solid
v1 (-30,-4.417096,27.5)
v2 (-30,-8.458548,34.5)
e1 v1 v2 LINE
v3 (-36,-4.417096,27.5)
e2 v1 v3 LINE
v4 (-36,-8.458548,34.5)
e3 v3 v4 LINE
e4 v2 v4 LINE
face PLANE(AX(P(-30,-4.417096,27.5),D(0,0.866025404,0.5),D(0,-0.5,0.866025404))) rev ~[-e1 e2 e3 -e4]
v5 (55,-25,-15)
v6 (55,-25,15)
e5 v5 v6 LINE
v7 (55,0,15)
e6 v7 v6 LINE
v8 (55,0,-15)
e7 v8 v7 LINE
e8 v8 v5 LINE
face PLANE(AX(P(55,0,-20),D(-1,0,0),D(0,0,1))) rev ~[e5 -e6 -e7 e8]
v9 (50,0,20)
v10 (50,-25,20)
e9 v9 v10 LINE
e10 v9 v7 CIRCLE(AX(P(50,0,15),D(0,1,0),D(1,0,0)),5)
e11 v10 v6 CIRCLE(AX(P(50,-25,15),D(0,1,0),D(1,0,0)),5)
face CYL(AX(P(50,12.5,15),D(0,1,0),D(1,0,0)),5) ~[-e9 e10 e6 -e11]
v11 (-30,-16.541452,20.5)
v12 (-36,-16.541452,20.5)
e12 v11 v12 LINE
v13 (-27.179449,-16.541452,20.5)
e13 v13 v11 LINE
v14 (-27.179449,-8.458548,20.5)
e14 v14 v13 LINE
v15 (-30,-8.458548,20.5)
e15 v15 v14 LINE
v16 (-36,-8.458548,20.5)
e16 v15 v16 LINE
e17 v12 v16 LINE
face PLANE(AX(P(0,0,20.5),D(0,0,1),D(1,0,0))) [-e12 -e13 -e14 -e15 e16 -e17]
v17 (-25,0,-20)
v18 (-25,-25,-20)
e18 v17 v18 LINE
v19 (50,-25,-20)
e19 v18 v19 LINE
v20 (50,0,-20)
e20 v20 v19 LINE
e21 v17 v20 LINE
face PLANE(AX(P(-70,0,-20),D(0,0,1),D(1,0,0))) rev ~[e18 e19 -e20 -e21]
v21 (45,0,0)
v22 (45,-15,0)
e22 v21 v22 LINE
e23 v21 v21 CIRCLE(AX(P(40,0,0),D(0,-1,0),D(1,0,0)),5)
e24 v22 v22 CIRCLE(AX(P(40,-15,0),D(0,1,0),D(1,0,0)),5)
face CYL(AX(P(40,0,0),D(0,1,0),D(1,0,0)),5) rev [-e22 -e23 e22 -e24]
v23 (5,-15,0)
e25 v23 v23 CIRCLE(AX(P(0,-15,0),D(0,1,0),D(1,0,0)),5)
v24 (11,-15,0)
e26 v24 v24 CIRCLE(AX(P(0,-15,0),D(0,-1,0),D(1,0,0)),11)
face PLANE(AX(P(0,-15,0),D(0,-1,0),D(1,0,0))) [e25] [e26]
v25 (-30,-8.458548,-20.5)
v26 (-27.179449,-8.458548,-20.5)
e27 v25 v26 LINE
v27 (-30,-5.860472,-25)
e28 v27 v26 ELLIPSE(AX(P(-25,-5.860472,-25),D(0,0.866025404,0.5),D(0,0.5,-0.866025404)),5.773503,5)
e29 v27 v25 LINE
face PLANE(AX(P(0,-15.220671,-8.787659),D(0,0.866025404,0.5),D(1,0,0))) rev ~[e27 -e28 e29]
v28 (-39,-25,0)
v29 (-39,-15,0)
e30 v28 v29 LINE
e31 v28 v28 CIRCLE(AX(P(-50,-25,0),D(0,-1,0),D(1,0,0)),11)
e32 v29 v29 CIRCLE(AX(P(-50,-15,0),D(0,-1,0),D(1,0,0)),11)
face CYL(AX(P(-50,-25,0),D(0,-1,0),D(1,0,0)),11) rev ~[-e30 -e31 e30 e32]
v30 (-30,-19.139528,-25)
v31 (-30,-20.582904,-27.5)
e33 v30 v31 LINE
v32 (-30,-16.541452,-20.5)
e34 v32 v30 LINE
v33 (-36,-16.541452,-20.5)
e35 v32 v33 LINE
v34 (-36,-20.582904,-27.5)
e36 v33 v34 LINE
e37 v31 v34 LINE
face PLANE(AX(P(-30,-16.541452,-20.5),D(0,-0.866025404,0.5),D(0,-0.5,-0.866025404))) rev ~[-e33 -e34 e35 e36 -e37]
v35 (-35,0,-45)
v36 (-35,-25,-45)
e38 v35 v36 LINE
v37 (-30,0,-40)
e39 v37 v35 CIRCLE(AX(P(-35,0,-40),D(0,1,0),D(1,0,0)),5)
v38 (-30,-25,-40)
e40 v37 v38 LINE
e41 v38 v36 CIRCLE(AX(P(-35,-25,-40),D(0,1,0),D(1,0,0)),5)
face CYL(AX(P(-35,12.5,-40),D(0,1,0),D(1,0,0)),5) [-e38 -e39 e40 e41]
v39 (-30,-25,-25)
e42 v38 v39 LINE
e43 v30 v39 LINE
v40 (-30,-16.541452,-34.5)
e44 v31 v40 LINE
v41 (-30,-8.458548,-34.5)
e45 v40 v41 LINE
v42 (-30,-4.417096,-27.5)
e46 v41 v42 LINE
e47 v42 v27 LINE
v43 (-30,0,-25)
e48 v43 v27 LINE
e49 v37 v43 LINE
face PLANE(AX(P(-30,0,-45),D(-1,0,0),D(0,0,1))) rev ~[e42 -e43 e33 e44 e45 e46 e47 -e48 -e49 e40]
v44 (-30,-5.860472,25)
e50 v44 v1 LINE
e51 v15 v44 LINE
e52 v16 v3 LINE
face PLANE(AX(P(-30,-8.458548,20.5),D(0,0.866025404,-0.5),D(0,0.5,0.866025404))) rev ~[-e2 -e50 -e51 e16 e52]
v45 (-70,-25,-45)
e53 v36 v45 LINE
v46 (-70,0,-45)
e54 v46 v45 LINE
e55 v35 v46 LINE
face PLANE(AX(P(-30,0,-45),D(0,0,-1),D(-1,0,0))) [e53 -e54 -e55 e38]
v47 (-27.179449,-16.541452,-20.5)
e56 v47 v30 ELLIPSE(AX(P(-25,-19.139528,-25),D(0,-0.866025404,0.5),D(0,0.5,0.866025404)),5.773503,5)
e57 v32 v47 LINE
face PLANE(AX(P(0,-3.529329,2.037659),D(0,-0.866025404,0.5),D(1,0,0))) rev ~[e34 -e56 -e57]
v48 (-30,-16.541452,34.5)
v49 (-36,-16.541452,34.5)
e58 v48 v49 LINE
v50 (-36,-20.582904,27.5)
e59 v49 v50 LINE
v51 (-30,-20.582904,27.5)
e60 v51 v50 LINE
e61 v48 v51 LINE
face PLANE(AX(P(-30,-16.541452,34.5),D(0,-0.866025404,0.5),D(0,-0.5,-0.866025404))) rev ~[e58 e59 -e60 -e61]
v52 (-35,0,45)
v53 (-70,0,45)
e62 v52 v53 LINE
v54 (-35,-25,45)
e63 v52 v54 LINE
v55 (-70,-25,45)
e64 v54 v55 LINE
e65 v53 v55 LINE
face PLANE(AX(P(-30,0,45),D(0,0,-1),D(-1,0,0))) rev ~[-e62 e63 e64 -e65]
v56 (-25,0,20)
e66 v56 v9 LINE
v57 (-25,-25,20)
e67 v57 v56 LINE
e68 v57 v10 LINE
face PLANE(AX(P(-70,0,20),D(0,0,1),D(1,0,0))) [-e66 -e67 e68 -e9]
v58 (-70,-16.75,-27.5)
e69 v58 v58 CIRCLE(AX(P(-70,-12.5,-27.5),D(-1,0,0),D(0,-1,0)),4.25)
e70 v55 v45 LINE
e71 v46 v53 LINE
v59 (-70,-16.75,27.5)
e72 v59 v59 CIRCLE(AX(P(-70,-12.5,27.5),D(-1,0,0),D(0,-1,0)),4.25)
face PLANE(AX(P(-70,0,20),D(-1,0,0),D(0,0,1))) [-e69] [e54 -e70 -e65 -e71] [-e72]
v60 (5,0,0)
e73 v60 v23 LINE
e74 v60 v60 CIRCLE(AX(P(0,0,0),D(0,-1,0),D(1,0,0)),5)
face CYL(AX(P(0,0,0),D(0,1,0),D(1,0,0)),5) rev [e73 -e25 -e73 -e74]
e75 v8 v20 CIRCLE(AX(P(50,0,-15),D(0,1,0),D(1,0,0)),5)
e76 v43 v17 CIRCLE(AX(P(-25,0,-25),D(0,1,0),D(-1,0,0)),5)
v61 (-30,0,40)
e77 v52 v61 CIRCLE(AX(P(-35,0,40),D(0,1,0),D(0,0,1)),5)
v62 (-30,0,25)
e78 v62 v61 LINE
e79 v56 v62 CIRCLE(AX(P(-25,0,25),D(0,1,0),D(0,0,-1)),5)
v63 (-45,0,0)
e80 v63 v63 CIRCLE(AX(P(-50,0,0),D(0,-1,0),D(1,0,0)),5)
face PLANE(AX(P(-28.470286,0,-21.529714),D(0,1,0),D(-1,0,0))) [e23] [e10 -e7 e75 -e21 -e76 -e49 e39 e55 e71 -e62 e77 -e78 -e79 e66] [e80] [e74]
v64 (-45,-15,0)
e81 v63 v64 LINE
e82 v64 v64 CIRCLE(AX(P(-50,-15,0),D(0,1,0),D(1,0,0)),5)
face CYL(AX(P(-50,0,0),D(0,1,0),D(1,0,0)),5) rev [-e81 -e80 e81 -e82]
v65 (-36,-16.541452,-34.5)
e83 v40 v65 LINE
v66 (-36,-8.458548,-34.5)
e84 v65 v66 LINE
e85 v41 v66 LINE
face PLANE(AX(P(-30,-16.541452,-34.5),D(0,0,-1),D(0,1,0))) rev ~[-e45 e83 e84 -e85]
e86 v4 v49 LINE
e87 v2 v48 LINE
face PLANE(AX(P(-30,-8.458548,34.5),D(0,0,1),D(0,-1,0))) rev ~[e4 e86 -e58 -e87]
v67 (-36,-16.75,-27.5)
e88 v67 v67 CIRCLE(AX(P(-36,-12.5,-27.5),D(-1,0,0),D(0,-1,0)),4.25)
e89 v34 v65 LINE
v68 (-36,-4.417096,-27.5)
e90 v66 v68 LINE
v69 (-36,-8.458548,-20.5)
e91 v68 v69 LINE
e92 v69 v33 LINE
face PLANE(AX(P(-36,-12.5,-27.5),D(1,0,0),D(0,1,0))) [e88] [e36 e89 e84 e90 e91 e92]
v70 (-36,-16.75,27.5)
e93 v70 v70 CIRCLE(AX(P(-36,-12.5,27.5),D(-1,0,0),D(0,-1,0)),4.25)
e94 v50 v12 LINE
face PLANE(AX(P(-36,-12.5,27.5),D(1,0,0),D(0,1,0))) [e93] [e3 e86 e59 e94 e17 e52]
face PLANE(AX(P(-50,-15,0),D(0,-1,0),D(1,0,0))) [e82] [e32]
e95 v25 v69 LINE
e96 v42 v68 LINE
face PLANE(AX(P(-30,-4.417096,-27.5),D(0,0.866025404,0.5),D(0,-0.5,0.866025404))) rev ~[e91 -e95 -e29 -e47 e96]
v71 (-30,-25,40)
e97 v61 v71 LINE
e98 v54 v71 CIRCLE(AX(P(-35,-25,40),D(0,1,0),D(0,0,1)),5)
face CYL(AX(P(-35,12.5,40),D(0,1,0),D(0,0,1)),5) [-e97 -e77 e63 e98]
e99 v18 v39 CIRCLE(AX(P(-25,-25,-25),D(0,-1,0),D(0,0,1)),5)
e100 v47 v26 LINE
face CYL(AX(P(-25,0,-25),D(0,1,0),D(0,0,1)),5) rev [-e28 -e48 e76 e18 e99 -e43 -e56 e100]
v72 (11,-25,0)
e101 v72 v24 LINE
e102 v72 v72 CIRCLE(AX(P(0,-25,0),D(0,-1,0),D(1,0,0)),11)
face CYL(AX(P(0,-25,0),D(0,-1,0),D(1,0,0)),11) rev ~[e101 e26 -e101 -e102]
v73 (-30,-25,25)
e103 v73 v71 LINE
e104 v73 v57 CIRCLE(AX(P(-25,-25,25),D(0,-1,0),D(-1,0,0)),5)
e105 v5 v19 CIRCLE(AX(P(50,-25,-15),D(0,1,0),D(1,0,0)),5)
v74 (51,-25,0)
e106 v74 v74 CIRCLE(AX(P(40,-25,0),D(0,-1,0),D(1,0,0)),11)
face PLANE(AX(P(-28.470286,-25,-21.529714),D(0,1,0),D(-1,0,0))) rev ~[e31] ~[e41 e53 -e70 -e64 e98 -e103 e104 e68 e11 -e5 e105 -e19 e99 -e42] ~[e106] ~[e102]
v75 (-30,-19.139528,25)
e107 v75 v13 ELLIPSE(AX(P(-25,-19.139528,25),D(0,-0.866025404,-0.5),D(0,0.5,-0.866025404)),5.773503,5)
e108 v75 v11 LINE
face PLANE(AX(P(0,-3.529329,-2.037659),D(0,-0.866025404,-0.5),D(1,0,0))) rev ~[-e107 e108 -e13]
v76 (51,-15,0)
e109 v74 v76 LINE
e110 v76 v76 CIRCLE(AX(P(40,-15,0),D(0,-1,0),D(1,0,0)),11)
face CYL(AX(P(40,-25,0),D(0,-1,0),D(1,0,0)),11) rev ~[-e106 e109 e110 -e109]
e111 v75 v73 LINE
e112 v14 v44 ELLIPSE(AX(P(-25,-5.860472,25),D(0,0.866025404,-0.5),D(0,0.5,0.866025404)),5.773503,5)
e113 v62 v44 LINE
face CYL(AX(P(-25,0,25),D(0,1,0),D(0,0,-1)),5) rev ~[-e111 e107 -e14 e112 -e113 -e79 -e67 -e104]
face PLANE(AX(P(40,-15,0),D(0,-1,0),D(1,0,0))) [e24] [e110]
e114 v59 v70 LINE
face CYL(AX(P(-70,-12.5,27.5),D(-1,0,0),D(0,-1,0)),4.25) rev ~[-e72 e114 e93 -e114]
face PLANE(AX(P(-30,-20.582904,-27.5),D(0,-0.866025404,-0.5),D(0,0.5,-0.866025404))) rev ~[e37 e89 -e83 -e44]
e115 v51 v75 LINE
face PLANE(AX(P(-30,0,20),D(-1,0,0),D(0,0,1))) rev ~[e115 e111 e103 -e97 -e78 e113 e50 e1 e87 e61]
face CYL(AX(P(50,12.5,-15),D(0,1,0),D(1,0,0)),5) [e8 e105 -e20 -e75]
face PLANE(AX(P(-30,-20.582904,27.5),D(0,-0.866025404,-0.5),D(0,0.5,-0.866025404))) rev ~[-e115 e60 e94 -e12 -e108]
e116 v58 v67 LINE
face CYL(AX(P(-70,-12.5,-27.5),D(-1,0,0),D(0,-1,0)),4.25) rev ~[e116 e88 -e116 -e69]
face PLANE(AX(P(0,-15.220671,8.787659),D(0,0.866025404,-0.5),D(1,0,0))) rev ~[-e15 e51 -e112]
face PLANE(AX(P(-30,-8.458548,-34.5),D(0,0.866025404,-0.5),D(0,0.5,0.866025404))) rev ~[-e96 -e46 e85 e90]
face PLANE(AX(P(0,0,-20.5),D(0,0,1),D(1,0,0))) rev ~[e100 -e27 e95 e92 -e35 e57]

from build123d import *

# Parameters (mm, degrees)
F0_W          = 125
F0_H          = 40
F0_R          = 5
F1_DEPTH      = 25
F2_R          = 11
F3_DEPTH      = 10
F4_W          = 40
F4_H          = 25
F5_DEPTH      = 25
F6_R          = 4.25
F7_DEPTH      = 40
F9_DEPTH      = 6
F10_T4_DEPTH  = 25
F10_T10_DEPTH = 25
F10_T16_DEPTH = 25
F10_T23_DEPTH = 25
F10_T29_DEPTH = 25
F10_T35_DEPTH = 25
F10_T41_DEPTH = 25
F10_T47_DEPTH = 25
F10_T54_DEPTH = 25
F10_T60_DEPTH = 25
F10_T63_DEPTH = 50


# Not quite as in the source:
# - a fillet or chamfer that OpenCascade refuses, or shapes differently, is made with other operations: its cross-section is extruded or revolved along the edge and cut away or added


with BuildPart() as f1:
    # F0 (on Front) → F1 (new body)
    with BuildSketch(Plane.XZ):
        with Locations((-7.5, 0)):
            Rectangle(F0_W, F0_H)
        with Locations((-50, 0)):
            Circle(F0_R, mode=Mode.SUBTRACT)
        Circle(F0_R, mode=Mode.SUBTRACT)
        with Locations((40, 0)):
            Circle(F0_R, mode=Mode.SUBTRACT)
    extrude(amount=F1_DEPTH)

    # F2 (on face) → F3 (cut)
    with BuildSketch(Plane.XZ.offset(25)):
        with Locations((-50, 0)):
            Circle(F2_R)
        Circle(F2_R)
        with Locations((40, 0)):
            Circle(F2_R)
    extrude(amount=-F3_DEPTH, mode=Mode.SUBTRACT)

    # F4 (on face) → F5 (join)
    with BuildSketch(Plane(origin=(0, 0, 0), x_dir=(-1, 0, 0), z_dir=(0, 1, 0))):
        with Locations((50, 32.5)):
            Rectangle(F4_W, F4_H)
        with Locations((50, -32.5)):
            Rectangle(F4_W, F4_H)
    extrude(amount=-F5_DEPTH)

    # F6 (on face) → F7 (cut, through all)
    with BuildSketch(Plane(origin=(-70, 0, 0), x_dir=(0, -1, 0), z_dir=(-1, 0, 0))):
        with Locations((12.5, 27.5)):
            Circle(F6_R)
        with Locations((12.5, -27.5)):
            Circle(F6_R)
    extrude(amount=-F7_DEPTH, mode=Mode.SUBTRACT)

    # F8 (on face) → F9 (cut)
    with BuildSketch(Plane.YZ.offset(-30)):
        Polygon((-8.4585481157, 34.5), (-16.5414518843, 34.5), (-20.5829037687, 27.5), (-16.5414518843, 20.5), (-8.4585481157, 20.5), (-4.4170962313, 27.5), align=None)
        Polygon((-8.4585481157, -20.5), (-16.5414518843, -20.5), (-20.5829037687, -27.5), (-16.5414518843, -34.5), (-8.4585481157, -34.5), (-4.4170962313, -27.5), align=None)
    extrude(amount=-F9_DEPTH, mode=Mode.SUBTRACT)

    # F10: fillet of radius 5 on 6 edges, made by hand


with BuildPart() as f10_tool2:
    # F10_s3 → F10_t4 (new body)
    with BuildSketch(Plane.XZ):
        with BuildLine():
            ThreePointArc((-25, 20), (-28.5355339059, 21.4644660941), (-30, 25))
            Line((-30, 25), (-30, 20))
            Line((-30, 20), (-25, 20))
        make_face()
    extrude(amount=F10_T4_DEPTH)

    split(bisect_by=Plane.XY.offset(20.5), keep=Keep.BOTTOM)

    split(bisect_by=Plane(origin=(0, -15.2206714755, 8.7876587737), x_dir=(1, 0, 0), z_dir=(0, 0.8660254038, -0.5)), keep=Keep.TOP)


with BuildPart() as f1_1:
    add(f1.part)

    # F10_t1: union F10_tool2
    add(f10_tool2.part)


with BuildPart() as f10_tool8:
    # F10_s9 → F10_t10 (new body)
    with BuildSketch(Plane.XZ):
        with BuildLine():
            ThreePointArc((-25, 20), (-28.5355339059, 21.4644660941), (-30, 25))
            Line((-30, 25), (-30, 20))
            Line((-30, 20), (-25, 20))
        make_face()
    extrude(amount=F10_T10_DEPTH)

    split(bisect_by=Plane.XY.offset(20.5), keep=Keep.TOP)

    split(bisect_by=Plane(origin=(0, -15.2206714755, 8.7876587737), x_dir=(1, 0, 0), z_dir=(0, 0.8660254038, -0.5)), keep=Keep.TOP)


with BuildPart() as f1_2:
    add(f1_1.part)

    # F10_t7: union F10_tool8
    add(f10_tool8.part)


with BuildPart() as f10_tool14:
    # F10_s15 → F10_t16 (new body)
    with BuildSketch(Plane.XZ):
        with BuildLine():
            ThreePointArc((-25, 20), (-28.5355339059, 21.4644660941), (-30, 25))
            Line((-30, 25), (-30, 20))
            Line((-30, 20), (-25, 20))
        make_face()
    extrude(amount=F10_T16_DEPTH)

    split(bisect_by=Plane(origin=(0, -3.5293285245, -2.0376587737), x_dir=(1, 0, 0), z_dir=(0, 0.8660254038, 0.5)), keep=Keep.TOP)

    split(bisect_by=Plane.XY.offset(20.5), keep=Keep.BOTTOM)

    split(bisect_by=Plane(origin=(0, -15.2206714755, 8.7876587737), x_dir=(1, 0, 0), z_dir=(0, -0.8660254038, 0.5)), keep=Keep.TOP)


with BuildPart() as f1_3:
    add(f1_2.part)

    # F10_t13: union F10_tool14
    add(f10_tool14.part)


with BuildPart() as f10_tool21:
    # F10_s22 → F10_t23 (new body)
    with BuildSketch(Plane.XZ):
        with BuildLine():
            ThreePointArc((-25, 20), (-28.5355339059, 21.4644660941), (-30, 25))
            Line((-30, 25), (-30, 20))
            Line((-30, 20), (-25, 20))
        make_face()
    extrude(amount=F10_T23_DEPTH)

    split(bisect_by=Plane(origin=(0, -3.5293285245, -2.0376587737), x_dir=(1, 0, 0), z_dir=(0, -0.8660254038, -0.5)), keep=Keep.TOP)

    split(bisect_by=Plane.XY.offset(20.5), keep=Keep.BOTTOM)


with BuildPart() as f1_4:
    add(f1_3.part)

    # F10_t20: union F10_tool21
    add(f10_tool21.part)


with BuildPart() as f10_tool27:
    # F10_s28 → F10_t29 (new body)
    with BuildSketch(Plane.XZ):
        with BuildLine():
            ThreePointArc((-25, 20), (-28.5355339059, 21.4644660941), (-30, 25))
            Line((-30, 25), (-30, 20))
            Line((-30, 20), (-25, 20))
        make_face()
    extrude(amount=F10_T29_DEPTH)

    split(bisect_by=Plane(origin=(0, -3.5293285245, -2.0376587737), x_dir=(1, 0, 0), z_dir=(0, -0.8660254038, -0.5)), keep=Keep.TOP)

    split(bisect_by=Plane.XY.offset(20.5), keep=Keep.TOP)


with BuildPart() as f1_5:
    add(f1_4.part)

    # F10_t26: union F10_tool27
    add(f10_tool27.part)


with BuildPart() as f10_tool33:
    # F10_s34 → F10_t35 (new body)
    with BuildSketch(Plane.XZ):
        with BuildLine():
            ThreePointArc((-25, -20), (-28.5355339059, -21.4644660941), (-30, -25))
            Line((-30, -25), (-30, -20))
            Line((-30, -20), (-25, -20))
        make_face()
    extrude(amount=F10_T35_DEPTH)

    split(bisect_by=Plane.XY.offset(-20.5), keep=Keep.TOP)

    split(bisect_by=Plane(origin=(0, -15.2206714755, -8.7876587737), x_dir=(1, 0, 0), z_dir=(0, 0.8660254038, 0.5)), keep=Keep.TOP)


with BuildPart() as f1_6:
    add(f1_5.part)

    # F10_t32: union F10_tool33
    add(f10_tool33.part)


with BuildPart() as f10_tool39:
    # F10_s40 → F10_t41 (new body)
    with BuildSketch(Plane.XZ):
        with BuildLine():
            ThreePointArc((-25, -20), (-28.5355339059, -21.4644660941), (-30, -25))
            Line((-30, -25), (-30, -20))
            Line((-30, -20), (-25, -20))
        make_face()
    extrude(amount=F10_T41_DEPTH)

    split(bisect_by=Plane.XY.offset(-20.5), keep=Keep.BOTTOM)

    split(bisect_by=Plane(origin=(0, -15.2206714755, -8.7876587737), x_dir=(1, 0, 0), z_dir=(0, 0.8660254038, 0.5)), keep=Keep.TOP)


with BuildPart() as f1_7:
    add(f1_6.part)

    # F10_t38: union F10_tool39
    add(f10_tool39.part)


with BuildPart() as f10_tool45:
    # F10_s46 → F10_t47 (new body)
    with BuildSketch(Plane.XZ):
        with BuildLine():
            ThreePointArc((-25, -20), (-28.5355339059, -21.4644660941), (-30, -25))
            Line((-30, -25), (-30, -20))
            Line((-30, -20), (-25, -20))
        make_face()
    extrude(amount=F10_T47_DEPTH)

    split(bisect_by=Plane.XY.offset(-20.5), keep=Keep.TOP)

    split(bisect_by=Plane(origin=(0, -3.5293285245, 2.0376587737), x_dir=(1, 0, 0), z_dir=(0, 0.8660254038, -0.5)), keep=Keep.TOP)

    split(bisect_by=Plane(origin=(0, -15.2206714755, -8.7876587737), x_dir=(1, 0, 0), z_dir=(0, -0.8660254038, -0.5)), keep=Keep.TOP)


with BuildPart() as f1_8:
    add(f1_7.part)

    # F10_t44: union F10_tool45
    add(f10_tool45.part)


with BuildPart() as f10_tool52:
    # F10_s53 → F10_t54 (new body)
    with BuildSketch(Plane.XZ):
        with BuildLine():
            ThreePointArc((-25, -20), (-28.5355339059, -21.4644660941), (-30, -25))
            Line((-30, -25), (-30, -20))
            Line((-30, -20), (-25, -20))
        make_face()
    extrude(amount=F10_T54_DEPTH)

    split(bisect_by=Plane.XY.offset(-20.5), keep=Keep.TOP)

    split(bisect_by=Plane(origin=(0, -3.5293285245, 2.0376587737), x_dir=(1, 0, 0), z_dir=(0, -0.8660254038, 0.5)), keep=Keep.TOP)


with BuildPart() as f1_9:
    add(f1_8.part)

    # F10_t51: union F10_tool52
    add(f10_tool52.part)


with BuildPart() as f10_tool58:
    # F10_s59 → F10_t60 (new body)
    with BuildSketch(Plane.XZ):
        with BuildLine():
            ThreePointArc((-25, -20), (-28.5355339059, -21.4644660941), (-30, -25))
            Line((-30, -25), (-30, -20))
            Line((-30, -20), (-25, -20))
        make_face()
    extrude(amount=F10_T60_DEPTH)

    split(bisect_by=Plane.XY.offset(-20.5), keep=Keep.BOTTOM)

    split(bisect_by=Plane(origin=(0, -3.5293285245, 2.0376587737), x_dir=(1, 0, 0), z_dir=(0, -0.8660254038, 0.5)), keep=Keep.TOP)


with BuildPart() as f1_10:
    add(f1_9.part)

    # F10_t57: union F10_tool58
    add(f10_tool58.part)

    # F10_s64 → F10_t63 (cut)
    with BuildSketch(Plane.XZ.offset(-12.5)):
        with BuildLine():
            ThreePointArc((-35, 45), (-31.4644660941, 43.5355339059), (-30, 40))
            Line((-30, 40), (-30, 45))
            Line((-30, 45), (-35, 45))
        make_face()
        with BuildLine():
            ThreePointArc((-30, -40), (-31.4644660941, -43.5355339059), (-35, -45))
            Line((-35, -45), (-30, -45))
            Line((-30, -45), (-30, -40))
        make_face()
        with BuildLine():
            ThreePointArc((55, -15), (53.5355339059, -18.5355339059), (50, -20))
            Line((50, -20), (55, -20))
            Line((55, -20), (55, -15))
        make_face()
        with BuildLine():
            ThreePointArc((55, 15), (53.5355339059, 18.5355339059), (50, 20))
            Line((50, 20), (55, 20))
            Line((55, 20), (55, 15))
        make_face()
    extrude(amount=F10_T63_DEPTH, mode=Mode.SUBTRACT)


solid = f1_10.part
